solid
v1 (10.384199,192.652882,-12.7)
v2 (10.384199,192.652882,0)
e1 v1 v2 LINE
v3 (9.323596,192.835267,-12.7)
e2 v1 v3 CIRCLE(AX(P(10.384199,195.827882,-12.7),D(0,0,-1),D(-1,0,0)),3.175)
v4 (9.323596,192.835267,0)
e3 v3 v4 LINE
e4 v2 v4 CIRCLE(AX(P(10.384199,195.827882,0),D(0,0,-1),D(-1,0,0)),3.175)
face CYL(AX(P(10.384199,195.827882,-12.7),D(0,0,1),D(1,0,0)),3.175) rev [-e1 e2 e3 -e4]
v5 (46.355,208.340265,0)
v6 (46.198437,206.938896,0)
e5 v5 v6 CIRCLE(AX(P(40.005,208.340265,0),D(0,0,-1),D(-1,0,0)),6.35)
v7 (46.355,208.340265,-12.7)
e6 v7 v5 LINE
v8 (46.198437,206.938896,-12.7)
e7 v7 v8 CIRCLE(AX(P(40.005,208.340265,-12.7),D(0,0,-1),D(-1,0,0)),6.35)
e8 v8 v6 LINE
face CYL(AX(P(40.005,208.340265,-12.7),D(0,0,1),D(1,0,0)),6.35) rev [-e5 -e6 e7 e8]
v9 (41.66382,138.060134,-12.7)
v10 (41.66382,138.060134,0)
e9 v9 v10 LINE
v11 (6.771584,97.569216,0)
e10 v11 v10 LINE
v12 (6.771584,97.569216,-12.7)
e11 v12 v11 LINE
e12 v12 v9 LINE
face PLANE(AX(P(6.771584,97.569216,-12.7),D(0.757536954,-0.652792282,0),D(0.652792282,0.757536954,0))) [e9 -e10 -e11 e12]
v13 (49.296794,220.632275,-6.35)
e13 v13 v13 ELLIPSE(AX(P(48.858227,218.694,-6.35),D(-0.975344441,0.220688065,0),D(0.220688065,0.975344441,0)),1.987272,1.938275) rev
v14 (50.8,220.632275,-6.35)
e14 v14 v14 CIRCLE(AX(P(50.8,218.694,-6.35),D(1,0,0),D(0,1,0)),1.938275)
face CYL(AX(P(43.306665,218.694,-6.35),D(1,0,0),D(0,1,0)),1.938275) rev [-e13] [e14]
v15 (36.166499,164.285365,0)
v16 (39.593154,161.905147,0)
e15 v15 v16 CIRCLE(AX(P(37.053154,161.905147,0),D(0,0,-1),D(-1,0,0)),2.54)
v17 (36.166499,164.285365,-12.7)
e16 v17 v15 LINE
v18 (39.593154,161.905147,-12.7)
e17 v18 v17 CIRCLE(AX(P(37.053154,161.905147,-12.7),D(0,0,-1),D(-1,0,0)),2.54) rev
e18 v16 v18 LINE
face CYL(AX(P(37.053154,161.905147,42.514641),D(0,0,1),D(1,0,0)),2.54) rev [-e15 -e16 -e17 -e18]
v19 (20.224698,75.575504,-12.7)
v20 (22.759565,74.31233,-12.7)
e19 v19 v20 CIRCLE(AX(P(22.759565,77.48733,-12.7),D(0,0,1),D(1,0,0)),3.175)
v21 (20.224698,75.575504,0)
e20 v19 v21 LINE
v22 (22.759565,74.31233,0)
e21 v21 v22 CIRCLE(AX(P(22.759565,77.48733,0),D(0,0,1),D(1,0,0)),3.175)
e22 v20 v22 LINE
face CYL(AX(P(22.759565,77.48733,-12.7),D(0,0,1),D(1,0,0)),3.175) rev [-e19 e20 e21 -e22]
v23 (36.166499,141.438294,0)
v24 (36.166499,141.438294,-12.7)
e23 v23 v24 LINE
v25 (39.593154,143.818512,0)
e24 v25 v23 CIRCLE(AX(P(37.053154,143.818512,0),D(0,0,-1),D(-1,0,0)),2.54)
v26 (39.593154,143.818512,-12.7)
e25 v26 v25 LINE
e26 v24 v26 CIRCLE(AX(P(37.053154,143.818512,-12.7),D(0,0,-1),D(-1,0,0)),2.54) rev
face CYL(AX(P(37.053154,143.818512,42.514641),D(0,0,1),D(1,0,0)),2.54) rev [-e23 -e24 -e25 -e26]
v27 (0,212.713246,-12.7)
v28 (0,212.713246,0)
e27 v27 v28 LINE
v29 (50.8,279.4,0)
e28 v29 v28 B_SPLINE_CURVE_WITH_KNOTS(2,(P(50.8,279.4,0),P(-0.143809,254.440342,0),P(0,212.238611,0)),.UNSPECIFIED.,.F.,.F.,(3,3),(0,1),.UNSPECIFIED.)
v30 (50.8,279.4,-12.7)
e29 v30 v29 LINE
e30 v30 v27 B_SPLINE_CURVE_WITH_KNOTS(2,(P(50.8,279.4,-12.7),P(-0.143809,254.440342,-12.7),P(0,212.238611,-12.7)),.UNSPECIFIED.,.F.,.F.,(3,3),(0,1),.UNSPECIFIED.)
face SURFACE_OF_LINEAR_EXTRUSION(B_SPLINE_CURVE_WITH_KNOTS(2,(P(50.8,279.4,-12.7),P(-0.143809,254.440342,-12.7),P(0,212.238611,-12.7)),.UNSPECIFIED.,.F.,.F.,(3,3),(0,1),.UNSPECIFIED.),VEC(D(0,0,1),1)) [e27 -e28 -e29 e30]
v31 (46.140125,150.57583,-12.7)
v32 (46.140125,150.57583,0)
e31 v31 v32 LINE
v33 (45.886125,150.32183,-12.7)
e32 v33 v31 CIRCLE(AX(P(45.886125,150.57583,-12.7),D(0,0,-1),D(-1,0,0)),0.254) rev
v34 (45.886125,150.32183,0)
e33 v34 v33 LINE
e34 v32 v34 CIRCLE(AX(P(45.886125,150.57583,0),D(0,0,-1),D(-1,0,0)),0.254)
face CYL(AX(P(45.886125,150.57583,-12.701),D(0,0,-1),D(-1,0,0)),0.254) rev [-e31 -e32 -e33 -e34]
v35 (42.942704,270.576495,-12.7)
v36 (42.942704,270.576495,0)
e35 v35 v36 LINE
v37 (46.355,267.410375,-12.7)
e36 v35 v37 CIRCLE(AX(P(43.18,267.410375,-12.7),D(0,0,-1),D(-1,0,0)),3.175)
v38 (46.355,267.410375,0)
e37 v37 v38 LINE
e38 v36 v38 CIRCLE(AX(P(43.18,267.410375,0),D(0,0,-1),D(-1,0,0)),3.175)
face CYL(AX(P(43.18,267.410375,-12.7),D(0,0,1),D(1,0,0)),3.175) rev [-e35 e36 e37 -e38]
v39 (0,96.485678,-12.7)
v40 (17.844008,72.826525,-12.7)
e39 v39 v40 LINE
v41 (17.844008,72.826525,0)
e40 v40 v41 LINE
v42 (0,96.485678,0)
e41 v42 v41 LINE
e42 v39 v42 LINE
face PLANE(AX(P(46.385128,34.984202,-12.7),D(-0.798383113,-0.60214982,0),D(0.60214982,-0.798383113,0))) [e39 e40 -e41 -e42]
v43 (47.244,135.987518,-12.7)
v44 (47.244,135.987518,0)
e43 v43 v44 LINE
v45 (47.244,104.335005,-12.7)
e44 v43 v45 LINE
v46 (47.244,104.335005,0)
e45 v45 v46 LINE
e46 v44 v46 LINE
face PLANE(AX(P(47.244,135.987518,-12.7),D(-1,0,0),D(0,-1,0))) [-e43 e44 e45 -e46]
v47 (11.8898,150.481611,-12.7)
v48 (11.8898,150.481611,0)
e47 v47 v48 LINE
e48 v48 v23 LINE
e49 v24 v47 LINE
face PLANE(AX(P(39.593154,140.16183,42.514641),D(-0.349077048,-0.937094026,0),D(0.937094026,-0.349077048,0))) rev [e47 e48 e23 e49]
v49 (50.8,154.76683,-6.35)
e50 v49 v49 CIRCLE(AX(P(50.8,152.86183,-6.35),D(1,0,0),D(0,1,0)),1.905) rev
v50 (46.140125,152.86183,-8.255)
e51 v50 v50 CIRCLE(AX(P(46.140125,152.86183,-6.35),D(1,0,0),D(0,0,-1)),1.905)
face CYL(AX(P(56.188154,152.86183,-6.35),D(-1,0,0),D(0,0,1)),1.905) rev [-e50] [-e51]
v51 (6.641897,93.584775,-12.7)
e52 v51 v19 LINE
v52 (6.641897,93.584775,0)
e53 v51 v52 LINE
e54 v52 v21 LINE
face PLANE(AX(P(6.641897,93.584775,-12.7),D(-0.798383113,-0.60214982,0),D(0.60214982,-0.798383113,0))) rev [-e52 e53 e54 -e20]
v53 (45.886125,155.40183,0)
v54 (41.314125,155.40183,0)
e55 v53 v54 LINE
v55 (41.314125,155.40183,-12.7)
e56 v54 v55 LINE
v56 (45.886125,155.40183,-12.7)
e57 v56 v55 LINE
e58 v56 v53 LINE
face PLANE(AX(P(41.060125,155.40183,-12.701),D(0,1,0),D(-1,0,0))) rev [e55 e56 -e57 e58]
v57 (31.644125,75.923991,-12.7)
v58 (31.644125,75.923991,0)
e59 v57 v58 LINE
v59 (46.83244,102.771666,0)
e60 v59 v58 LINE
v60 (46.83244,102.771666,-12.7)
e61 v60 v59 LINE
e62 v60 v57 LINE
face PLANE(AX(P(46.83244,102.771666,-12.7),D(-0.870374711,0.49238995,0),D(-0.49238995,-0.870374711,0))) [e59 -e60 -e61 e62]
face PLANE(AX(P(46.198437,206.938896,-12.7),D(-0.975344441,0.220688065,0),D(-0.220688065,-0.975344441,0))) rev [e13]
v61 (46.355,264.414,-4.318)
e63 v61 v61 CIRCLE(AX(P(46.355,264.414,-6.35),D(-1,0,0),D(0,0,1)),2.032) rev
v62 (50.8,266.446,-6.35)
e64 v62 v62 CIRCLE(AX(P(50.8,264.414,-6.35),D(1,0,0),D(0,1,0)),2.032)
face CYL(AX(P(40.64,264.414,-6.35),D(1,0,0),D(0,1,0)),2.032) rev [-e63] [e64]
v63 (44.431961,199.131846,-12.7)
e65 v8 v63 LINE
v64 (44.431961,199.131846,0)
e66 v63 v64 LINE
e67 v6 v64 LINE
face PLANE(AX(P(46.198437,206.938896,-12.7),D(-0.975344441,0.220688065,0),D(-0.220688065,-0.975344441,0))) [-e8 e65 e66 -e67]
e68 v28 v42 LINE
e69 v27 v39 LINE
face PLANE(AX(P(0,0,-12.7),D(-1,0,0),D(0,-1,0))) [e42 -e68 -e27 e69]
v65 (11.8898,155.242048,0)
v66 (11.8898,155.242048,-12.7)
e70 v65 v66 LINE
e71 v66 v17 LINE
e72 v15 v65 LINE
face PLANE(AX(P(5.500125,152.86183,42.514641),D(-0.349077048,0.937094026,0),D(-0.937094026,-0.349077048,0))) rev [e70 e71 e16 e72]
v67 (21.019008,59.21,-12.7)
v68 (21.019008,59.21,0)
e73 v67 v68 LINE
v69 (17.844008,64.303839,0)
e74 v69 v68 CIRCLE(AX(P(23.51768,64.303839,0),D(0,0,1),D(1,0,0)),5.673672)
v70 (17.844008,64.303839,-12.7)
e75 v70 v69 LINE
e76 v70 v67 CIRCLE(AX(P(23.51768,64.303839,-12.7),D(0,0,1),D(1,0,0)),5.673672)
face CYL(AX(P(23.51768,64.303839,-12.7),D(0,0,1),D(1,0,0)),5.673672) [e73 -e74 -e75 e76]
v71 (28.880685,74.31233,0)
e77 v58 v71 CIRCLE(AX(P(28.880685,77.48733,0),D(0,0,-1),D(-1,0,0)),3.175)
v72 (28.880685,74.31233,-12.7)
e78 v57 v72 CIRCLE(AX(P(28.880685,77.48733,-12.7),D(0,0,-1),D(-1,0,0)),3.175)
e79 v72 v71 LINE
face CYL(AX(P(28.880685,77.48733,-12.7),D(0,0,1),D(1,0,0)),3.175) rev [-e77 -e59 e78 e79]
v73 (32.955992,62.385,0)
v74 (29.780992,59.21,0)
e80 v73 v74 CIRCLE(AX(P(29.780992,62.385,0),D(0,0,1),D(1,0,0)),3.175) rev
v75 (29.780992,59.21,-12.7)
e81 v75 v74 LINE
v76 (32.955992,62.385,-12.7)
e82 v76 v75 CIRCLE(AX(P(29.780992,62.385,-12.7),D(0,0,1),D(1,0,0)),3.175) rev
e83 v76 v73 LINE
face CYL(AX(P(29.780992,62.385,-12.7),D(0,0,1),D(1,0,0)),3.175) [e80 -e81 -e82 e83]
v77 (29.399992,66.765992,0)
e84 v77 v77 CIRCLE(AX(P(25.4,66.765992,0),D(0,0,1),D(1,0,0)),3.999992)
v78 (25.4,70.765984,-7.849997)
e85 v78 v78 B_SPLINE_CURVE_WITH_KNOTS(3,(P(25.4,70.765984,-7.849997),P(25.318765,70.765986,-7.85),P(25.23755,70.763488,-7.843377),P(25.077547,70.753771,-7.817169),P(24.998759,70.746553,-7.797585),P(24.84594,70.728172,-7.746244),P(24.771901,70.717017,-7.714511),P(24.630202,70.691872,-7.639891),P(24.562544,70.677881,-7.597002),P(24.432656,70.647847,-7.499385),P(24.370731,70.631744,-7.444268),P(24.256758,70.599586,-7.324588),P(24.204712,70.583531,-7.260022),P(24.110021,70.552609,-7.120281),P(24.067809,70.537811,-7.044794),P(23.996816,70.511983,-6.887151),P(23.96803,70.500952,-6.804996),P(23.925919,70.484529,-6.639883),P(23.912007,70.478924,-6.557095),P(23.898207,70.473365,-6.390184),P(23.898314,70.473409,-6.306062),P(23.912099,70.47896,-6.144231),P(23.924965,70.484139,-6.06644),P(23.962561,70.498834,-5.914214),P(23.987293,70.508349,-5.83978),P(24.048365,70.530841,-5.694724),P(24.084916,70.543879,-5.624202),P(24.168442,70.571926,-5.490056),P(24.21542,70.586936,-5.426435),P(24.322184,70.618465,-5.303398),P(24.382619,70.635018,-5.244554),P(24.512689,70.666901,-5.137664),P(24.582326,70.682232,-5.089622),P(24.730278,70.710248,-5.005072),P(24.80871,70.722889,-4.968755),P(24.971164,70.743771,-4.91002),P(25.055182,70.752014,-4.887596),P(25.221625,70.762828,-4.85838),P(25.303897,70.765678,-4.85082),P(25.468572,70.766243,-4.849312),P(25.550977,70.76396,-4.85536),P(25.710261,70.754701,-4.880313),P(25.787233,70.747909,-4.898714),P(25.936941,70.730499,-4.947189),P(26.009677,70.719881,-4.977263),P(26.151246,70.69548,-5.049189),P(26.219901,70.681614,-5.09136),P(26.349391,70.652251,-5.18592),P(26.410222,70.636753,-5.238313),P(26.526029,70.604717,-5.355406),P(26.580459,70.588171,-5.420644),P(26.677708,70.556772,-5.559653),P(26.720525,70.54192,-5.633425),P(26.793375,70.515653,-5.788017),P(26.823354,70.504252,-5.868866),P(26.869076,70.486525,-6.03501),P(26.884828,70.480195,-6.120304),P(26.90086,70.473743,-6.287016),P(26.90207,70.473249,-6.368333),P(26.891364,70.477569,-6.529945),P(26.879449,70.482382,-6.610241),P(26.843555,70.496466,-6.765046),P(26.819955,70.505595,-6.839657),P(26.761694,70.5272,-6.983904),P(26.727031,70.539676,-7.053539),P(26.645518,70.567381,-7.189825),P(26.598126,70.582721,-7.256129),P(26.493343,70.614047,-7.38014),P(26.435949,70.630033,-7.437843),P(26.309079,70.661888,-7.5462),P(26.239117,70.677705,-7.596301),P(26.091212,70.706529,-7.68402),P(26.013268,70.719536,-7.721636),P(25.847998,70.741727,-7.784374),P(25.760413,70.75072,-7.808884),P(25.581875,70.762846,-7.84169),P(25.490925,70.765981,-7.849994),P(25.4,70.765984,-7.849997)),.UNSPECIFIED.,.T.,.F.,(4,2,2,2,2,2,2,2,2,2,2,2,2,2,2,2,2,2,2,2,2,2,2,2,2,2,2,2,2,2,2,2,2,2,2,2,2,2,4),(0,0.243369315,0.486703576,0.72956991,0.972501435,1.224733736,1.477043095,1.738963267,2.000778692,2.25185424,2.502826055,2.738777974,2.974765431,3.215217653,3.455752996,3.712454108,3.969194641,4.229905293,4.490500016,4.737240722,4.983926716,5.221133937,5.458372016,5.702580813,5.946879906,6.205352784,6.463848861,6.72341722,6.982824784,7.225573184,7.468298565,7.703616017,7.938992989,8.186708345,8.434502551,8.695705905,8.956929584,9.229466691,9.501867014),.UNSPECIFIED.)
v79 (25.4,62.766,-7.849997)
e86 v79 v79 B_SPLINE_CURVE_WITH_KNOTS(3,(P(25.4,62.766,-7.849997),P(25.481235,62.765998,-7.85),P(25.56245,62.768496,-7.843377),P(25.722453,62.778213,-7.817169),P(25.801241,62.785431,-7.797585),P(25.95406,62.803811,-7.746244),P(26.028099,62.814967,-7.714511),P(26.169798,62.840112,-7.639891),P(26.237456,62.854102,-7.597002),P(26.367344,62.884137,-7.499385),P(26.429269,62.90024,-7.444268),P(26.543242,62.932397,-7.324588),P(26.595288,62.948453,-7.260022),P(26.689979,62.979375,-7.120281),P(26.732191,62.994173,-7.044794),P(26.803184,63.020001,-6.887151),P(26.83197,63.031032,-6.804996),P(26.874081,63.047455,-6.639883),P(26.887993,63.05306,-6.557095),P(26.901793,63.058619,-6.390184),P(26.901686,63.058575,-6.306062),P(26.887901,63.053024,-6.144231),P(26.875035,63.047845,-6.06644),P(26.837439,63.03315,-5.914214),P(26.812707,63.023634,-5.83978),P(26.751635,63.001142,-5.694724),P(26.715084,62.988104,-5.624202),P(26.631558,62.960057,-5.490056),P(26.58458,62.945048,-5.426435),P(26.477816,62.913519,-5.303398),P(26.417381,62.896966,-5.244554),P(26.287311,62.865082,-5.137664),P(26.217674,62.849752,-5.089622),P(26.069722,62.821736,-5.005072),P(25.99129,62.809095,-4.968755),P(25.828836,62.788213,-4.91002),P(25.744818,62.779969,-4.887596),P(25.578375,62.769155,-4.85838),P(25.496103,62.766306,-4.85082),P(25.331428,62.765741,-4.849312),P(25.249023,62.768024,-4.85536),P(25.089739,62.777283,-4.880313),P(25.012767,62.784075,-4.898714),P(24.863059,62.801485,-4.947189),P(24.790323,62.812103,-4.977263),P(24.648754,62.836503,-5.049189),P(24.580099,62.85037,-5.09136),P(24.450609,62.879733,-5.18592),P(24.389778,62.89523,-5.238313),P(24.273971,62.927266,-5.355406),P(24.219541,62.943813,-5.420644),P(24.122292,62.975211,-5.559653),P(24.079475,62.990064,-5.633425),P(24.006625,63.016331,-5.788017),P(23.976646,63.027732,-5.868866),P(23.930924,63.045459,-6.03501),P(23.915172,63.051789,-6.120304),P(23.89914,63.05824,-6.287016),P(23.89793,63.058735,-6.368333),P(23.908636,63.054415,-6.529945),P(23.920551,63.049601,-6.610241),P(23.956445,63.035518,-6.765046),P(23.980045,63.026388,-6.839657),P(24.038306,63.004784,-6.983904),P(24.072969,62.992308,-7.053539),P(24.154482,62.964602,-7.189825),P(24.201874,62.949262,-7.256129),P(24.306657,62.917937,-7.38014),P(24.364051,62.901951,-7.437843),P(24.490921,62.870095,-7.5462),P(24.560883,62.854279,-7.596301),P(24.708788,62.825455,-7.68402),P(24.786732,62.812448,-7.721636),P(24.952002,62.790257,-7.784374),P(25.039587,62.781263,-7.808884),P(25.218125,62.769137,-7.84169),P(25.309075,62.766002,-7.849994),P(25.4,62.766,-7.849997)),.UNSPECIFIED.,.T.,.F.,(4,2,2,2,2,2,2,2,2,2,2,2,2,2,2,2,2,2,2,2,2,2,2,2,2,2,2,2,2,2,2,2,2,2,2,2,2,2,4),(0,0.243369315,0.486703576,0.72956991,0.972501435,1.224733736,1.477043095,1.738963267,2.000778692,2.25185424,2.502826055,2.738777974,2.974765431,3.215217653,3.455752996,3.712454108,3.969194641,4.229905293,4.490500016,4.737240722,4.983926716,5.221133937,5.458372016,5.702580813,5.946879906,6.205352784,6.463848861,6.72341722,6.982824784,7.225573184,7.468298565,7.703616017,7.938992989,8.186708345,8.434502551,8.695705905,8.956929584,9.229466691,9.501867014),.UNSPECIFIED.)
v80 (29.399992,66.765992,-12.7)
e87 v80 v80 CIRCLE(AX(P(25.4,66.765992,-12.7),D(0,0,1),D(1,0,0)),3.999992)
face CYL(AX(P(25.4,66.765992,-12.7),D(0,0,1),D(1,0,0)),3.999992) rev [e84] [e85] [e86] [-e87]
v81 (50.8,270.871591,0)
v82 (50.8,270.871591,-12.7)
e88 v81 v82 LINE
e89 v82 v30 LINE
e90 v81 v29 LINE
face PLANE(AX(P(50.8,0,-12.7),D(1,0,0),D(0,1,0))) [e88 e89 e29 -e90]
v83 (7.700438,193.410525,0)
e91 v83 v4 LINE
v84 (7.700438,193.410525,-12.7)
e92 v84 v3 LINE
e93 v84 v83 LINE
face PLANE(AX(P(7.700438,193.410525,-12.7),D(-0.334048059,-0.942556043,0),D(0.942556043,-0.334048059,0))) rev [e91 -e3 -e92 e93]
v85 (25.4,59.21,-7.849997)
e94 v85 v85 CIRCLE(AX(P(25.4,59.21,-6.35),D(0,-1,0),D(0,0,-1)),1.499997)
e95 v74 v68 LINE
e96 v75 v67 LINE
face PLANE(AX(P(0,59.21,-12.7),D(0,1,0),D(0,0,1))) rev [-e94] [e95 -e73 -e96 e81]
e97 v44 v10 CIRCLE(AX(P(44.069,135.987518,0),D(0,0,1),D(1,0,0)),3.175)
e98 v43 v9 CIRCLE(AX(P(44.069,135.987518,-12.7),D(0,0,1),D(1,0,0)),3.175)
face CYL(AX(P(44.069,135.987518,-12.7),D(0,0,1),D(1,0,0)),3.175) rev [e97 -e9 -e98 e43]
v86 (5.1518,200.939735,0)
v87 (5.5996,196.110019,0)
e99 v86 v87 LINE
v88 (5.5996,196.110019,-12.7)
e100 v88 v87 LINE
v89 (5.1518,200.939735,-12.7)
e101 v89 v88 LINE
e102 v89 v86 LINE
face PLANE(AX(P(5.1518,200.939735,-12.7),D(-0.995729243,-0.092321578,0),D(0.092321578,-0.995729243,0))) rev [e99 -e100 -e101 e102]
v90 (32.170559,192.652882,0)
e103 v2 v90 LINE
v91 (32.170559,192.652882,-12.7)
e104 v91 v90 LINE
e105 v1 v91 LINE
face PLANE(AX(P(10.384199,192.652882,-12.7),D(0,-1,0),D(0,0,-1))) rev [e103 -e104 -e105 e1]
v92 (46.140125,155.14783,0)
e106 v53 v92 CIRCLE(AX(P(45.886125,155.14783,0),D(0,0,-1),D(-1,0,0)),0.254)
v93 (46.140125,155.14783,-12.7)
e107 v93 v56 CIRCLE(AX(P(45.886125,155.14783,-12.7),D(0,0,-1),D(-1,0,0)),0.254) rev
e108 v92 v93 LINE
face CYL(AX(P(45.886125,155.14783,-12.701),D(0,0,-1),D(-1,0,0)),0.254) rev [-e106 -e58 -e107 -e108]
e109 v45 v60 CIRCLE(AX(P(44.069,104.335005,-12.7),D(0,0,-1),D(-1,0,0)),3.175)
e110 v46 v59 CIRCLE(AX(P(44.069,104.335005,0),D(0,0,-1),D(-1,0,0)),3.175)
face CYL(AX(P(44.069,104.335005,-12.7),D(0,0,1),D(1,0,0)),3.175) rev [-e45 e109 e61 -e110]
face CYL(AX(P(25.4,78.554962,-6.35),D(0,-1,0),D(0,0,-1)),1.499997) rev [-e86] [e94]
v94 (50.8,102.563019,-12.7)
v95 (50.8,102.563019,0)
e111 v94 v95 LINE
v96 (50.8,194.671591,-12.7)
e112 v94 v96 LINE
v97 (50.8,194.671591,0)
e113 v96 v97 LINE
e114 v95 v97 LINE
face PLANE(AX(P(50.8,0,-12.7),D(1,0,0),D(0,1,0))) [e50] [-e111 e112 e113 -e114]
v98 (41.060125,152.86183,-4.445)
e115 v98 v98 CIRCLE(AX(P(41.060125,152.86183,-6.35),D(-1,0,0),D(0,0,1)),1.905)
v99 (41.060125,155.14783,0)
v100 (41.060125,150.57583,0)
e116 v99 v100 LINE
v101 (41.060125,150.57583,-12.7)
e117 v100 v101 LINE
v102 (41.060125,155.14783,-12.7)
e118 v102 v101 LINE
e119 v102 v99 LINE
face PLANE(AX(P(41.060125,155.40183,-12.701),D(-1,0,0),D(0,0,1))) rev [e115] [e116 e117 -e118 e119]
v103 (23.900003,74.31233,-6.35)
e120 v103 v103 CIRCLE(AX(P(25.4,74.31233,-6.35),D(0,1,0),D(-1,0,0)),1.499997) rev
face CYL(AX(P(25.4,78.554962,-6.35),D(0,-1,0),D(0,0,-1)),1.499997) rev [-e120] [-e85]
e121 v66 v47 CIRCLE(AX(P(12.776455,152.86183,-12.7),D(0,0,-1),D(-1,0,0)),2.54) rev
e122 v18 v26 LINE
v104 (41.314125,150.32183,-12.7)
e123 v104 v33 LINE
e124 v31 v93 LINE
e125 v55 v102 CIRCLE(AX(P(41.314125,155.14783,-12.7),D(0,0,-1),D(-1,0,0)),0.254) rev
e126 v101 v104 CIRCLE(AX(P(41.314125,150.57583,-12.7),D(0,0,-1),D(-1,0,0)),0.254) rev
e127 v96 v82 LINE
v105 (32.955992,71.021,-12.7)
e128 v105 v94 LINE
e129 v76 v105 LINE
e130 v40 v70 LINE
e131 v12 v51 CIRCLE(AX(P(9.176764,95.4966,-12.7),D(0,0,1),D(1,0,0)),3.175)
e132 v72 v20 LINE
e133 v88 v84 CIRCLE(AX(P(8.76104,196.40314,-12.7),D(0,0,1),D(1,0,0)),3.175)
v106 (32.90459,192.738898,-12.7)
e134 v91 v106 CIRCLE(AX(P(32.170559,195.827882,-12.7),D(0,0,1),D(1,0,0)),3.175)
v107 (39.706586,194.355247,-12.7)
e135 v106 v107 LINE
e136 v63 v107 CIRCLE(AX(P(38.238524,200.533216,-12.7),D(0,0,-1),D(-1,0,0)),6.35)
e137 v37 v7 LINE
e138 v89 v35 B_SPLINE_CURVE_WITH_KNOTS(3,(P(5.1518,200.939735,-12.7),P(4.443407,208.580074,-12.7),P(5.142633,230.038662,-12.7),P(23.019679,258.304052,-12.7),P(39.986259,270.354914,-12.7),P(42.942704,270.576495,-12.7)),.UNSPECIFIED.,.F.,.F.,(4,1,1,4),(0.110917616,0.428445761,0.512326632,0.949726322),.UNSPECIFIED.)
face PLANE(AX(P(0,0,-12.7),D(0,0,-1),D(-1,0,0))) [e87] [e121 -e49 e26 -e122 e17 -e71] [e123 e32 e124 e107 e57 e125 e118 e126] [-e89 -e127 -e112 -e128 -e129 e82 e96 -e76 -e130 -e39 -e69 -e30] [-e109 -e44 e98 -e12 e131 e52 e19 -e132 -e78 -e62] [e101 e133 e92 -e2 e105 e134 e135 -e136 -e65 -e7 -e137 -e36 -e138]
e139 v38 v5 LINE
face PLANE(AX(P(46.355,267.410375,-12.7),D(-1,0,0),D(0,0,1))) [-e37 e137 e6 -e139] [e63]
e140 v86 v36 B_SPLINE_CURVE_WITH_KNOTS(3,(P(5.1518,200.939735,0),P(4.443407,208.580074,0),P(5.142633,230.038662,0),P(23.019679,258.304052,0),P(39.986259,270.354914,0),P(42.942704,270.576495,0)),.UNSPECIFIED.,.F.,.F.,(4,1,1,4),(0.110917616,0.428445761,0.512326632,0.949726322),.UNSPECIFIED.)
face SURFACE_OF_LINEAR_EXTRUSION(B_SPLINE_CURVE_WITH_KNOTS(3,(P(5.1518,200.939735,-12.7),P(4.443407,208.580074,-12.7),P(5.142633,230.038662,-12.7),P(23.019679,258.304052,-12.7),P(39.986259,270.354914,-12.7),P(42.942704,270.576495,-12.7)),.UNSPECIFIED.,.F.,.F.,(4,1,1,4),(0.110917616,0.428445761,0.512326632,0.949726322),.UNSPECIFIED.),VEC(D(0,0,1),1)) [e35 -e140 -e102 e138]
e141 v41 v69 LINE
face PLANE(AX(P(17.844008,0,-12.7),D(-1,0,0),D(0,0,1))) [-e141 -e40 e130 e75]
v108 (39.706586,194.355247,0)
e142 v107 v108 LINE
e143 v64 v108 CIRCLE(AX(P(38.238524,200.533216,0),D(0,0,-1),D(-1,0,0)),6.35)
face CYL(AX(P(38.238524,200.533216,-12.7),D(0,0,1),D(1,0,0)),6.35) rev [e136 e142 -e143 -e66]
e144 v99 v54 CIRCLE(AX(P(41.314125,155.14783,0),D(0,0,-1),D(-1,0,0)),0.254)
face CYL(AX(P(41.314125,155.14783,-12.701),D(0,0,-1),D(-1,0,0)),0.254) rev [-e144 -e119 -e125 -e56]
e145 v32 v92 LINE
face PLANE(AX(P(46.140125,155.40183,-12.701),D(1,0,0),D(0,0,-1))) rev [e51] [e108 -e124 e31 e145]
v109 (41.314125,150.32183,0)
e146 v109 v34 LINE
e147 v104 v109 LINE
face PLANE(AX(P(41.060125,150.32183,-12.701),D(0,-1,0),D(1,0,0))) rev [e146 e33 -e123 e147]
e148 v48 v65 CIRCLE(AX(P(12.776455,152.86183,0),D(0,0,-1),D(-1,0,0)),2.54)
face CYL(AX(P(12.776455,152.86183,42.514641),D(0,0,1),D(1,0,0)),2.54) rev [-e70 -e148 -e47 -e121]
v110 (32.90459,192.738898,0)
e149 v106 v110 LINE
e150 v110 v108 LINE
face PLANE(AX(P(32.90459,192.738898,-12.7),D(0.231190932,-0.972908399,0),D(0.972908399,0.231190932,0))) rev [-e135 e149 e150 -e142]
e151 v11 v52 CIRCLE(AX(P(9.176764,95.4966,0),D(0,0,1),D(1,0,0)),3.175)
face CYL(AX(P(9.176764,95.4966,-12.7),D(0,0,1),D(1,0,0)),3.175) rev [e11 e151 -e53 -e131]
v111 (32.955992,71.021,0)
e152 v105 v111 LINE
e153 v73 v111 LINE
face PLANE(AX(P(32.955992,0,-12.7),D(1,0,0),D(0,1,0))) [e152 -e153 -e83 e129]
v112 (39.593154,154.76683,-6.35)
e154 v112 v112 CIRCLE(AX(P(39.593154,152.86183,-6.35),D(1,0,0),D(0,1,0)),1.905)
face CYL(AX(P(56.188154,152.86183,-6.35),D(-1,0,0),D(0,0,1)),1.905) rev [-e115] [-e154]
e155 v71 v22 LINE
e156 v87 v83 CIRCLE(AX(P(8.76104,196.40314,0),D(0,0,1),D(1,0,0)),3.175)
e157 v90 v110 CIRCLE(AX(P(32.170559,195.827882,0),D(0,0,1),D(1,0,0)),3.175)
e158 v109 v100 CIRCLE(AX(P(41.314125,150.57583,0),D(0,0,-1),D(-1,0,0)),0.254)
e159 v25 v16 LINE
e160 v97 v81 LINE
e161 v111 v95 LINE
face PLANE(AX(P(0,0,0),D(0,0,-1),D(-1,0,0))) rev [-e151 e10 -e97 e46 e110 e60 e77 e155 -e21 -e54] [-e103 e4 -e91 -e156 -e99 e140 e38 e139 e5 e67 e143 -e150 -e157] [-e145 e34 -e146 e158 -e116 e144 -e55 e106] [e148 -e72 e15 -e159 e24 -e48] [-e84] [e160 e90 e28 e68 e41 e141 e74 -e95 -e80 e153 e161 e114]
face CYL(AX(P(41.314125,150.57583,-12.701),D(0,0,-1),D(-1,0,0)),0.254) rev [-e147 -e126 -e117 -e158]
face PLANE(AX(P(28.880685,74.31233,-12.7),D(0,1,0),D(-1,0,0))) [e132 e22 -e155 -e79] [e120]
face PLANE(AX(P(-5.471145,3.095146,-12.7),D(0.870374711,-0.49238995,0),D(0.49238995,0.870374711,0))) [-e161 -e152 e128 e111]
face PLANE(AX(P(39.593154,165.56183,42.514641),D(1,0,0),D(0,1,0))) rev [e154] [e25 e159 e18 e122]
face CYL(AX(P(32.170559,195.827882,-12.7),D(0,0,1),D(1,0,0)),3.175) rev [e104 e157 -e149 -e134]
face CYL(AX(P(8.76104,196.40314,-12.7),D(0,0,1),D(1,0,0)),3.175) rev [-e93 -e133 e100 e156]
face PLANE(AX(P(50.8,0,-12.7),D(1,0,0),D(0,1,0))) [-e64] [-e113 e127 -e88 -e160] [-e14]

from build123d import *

# Parameters (mm, degrees)
SKETCH1_W                       = 50.8
SKETCH1_H                       = 279.4
BOSS_EXTRUDE1_DEPTH             = 12.7
SKETCH4_R                       = 3.175
CUT_EXTRUDE9_DEPTH              = 285.264471927
SKETCH12_R                      = 2.032
CUT_EXTRUDE7_DEPTH              = 10.16
SKETCH13_R                      = 3.999992
CUT_EXTRUDE8_DEPTH              = 285.264471927
CUT_EXTRUDE10_DEPTH             = 285.264471927
CUT_EXTRUDE11_START             = -1.503205808
CUT_EXTRUDE11_OUTLINE_R         = 1.938274984
CUT_EXTRUDE11_DEPTH             = 1.503205808
CUT_EXTRUDE11_START_2           = 48.41965954
CUT_EXTRUDE11_2_OUTLINE_R       = 1.938274984
CUT_EXTRUDE11_2_DEPTH           = 0.877134652
CUT_EXTRUDE11_START_3           = -2
CUT_EXTRUDE11_3_OUTLINE_W       = 7
CUT_EXTRUDE11_3_OUTLINE_H       = 7
CUT_EXTRUDE11_3_DEPTH           = 1.390444415
CUT_EXTRUDE12_REACH             = 228.331
SKETCH25_R                      = 1.499997
SKETCH27_R                      = 3.175
BOSS_EXTRUDE2_DEPTH             = 12.7
BOSS_EXTRUDE3_DEPTH             = 12.7
CUT_EXTRUDE13_REACH             = 286.264
SKETCH30_W                      = 5.08
SKETCH30_H                      = 5.08
FILLET1_R                       = 0.254
BOSS_EXTRUDE4_DEPTH             = 12.7
BOSS_EXTRUDE6_DEPTH             = 12.7
CUT_EXTRUDE16_DEPTH             = 12.7
FILLET2_R                       = 2.54
CUT_EXTRUDE15_REACH             = 285.469
SKETCH33_R                      = 1.905
CUT_EXTRUDE15_DIRECTION_2_REACH = 285.469


with BuildPart() as part:
    # Sketch1 → Boss-Extrude1 (new body)
    with BuildSketch(Plane.XY):
        with Locations((25.4, 139.7)):
            Rectangle(SKETCH1_W, SKETCH1_H)
    extrude(amount=-BOSS_EXTRUDE1_DEPTH)

    # Sketch4 → Cut-Extrude9 (cut, through all)
    with BuildSketch(Plane.XY):
        with Locations((23.83643591, 185.629212401)):
            Circle(SKETCH4_R)
    extrude(amount=-CUT_EXTRUDE9_DEPTH, mode=Mode.SUBTRACT)

    # Sketch12 → Cut-Extrude7 (cut)
    with BuildSketch(Plane(origin=(50.8, 0, 0), x_dir=(0, 0, -1), z_dir=(1, 0, 0))):
        with Locations(Location((6.35, 264.414, 0), (0, 0, 90))):
            Circle(SKETCH12_R)
    extrude(amount=-CUT_EXTRUDE7_DEPTH, mode=Mode.SUBTRACT)

    # Sketch13 → Cut-Extrude8 (cut, through all)
    with BuildSketch(Plane.XY):
        with Locations((25.4, 66.765991822)):
            Circle(SKETCH13_R)
    extrude(amount=-CUT_EXTRUDE8_DEPTH, mode=Mode.SUBTRACT)

    # Sketch23 → Cut-Extrude10 (cut, through all)
    with BuildSketch(Plane.XY):
        with BuildLine():
            ThreePointArc((9.684585518, 189.97530689), (6.134029107, 191.135611391), (3.936744482, 188.114899944))
            Line((3.936744482, 188.114899944), (3.936744482, 146.137041934))
            ThreePointArc((3.936744482, 146.137041934), (5.718074121, 143.284269963), (9.063237662, 143.632586032))
            Line((9.063237662, 143.632586032), (28.478072635, 158.76078933))
            ThreePointArc((28.478072635, 158.76078933), (29.669890916, 160.817787912), (29.09942049, 163.125652178))
            Line((29.09942049, 163.125652178), (9.684585518, 189.97530689))
        make_face()
        with BuildLine():
            ThreePointArc((25.454329065, 180.059457716), (24.214328296, 177.76665467), (24.841195831, 175.236519336))
            Line((24.841195831, 175.236519336), (41.277424699, 151.829201394))
            ThreePointArc((41.277424699, 151.829201394), (44.832564118, 150.626331551), (47.050818, 153.653749901))
            Line((47.050818, 153.653749901), (47.050818, 185.147561676))
            ThreePointArc((47.050818, 185.147561676), (46.630207739, 186.726790021), (45.479818209, 187.887599691))
            Line((45.479818209, 187.887599691), (44.197770493, 188.638101981))
            ThreePointArc((44.197770493, 188.638101981), (43.361590273, 188.9788232), (42.463311258, 189.070382588))
            Line((42.463311258, 189.070382588), (36.797920165, 188.837397982))
            ThreePointArc((36.797920165, 188.837397982), (35.770181972, 188.621293865), (34.869165079, 188.081742811))
            Line((34.869165079, 188.081742811), (25.454329065, 180.059457716))
        make_face()
        with BuildLine():
            Line((17.844008, 72.826525287), (0, 96.485678179))
            Line((0, 96.485678179), (0, 0))
            Line((0, 0), (50.8, 0))
            Line((50.8, 0), (50.8, 102.563019115))
            Line((50.8, 102.563019115), (32.955992, 71.020999822))
            Line((32.955992, 71.020999822), (32.955992, 62.384999822))
            ThreePointArc((32.955992, 62.384999822), (32.02605603, 60.139935792), (29.780992, 59.209999822))
            Line((29.780992, 59.209999822), (21.019008, 59.209999822))
            ThreePointArc((21.019008, 59.209999822), (18.702744933, 61.302679759), (17.844008, 64.303838667))
            Line((17.844008, 64.303838667), (17.844008, 72.826525287))
        make_face()
        with BuildLine():
            Line((0, 279.4), (0, 212.713248228))
            add(Edge.make_bspline(
                [(50.8, 279.4), (0.142999661, 254.58086249), (0, 212.713248228)],
                knots=[0, 0, 0, 0.994370092, 0.994370092, 0.994370092], degree=2))
            Line((50.8, 279.4), (0, 279.4))
        make_face()
        with BuildLine():
            Line((41.663820171, 138.060133531), (6.771583692, 97.569215865))
            ThreePointArc((6.771583692, 97.569215865), (6.003443965, 95.599886341), (6.641897139, 93.584774692))
            Line((6.641897139, 93.584774692), (20.224698456, 75.575503845))
            ThreePointArc((20.224698456, 75.575503845), (21.343482484, 74.645615997), (22.759564839, 74.312329523))
            Line((22.759564839, 74.312329523), (28.880684896, 74.312329523))
            ThreePointArc((28.880684896, 74.312329523), (30.480220228, 74.744682677), (31.644124603, 75.923991431))
            Line((31.644124603, 75.923991431), (46.832439707, 102.771666463))
            ThreePointArc((46.832439707, 102.771666463), (47.139386463, 103.526702652), (47.244, 104.335004554))
            Line((47.244, 104.335004554), (47.244, 135.987518036))
            ThreePointArc((47.244, 135.987518036), (45.174481579, 138.963847231), (41.663820171, 138.060133531))
        make_face()
        with BuildLine():
            Line((46.355, 208.340265374), (46.355, 267.410375004))
            ThreePointArc((46.355, 267.410375004), (45.339538097, 269.737824297), (42.942703805, 270.57649495))
            add(Edge.make_bspline(
                [(5.151800286, 200.939735337), (4.443406818, 208.580073659), (5.142632502, 230.03866236), (23.019678506, 258.304051629), (39.986259259, 270.354913629), (42.942703805, 270.57649495)],
                knots=[0.110917616, 0.110917616, 0.110917616, 0.110917616, 0.428445761, 0.512326632, 0.949726322, 0.949726322, 0.949726322, 0.949726322], degree=3))
            Line((5.151800286, 200.939735337), (5.599599739, 196.110019261))
            ThreePointArc((5.599599739, 196.110019261), (6.255400613, 194.453166983), (7.7004375, 193.410524834))
            Line((7.7004375, 193.410524834), (9.323596038, 192.835266777))
            ThreePointArc((9.323596038, 192.835266777), (9.8461136, 192.698810545), (10.384198625, 192.652882214))
            Line((10.384198625, 192.652882214), (32.17055899, 192.652882214))
            ThreePointArc((32.17055899, 192.652882214), (32.540085896, 192.674459492), (32.904590198, 192.738898047))
            Line((32.904590198, 192.738898047), (39.706586273, 194.355247347))
            ThreePointArc((39.706586273, 194.355247347), (42.752792223, 196.067358416), (44.431961055, 199.131846471))
            Line((44.431961055, 199.131846471), (46.198437199, 206.938896164))
            ThreePointArc((46.198437199, 206.938896164), (46.315737921, 207.635221479), (46.355, 208.340265374))
        make_face()
        with BuildLine():
            Line((29.980948296, 155.351785669), (4.812598642, 135.740395164))
            ThreePointArc((4.812598642, 135.740395164), (3.886943233, 134.599566539), (3.556, 133.168201993))
            Line((3.556, 133.168201993), (3.556, 110.456761818))
            ThreePointArc((3.556, 110.456761818), (5.634129033, 107.41794452), (9.219765375, 108.252356215))
            Line((9.219765375, 108.252356215), (40.635310398, 142.496582814))
            ThreePointArc((40.635310398, 142.496582814), (41.467985487, 144.51174404), (40.804546499, 146.588778291))
            Line((40.804546499, 146.588778291), (34.441290858, 154.793171429))
            ThreePointArc((34.441290858, 154.793171429), (32.32699686, 155.997718798), (29.980948296, 155.351785669))
        make_face()
    extrude(amount=-CUT_EXTRUDE10_DEPTH, mode=Mode.SUBTRACT)

    # Cut-Extrude11: read off the stored shape, not the designer's step
    # Cut-Extrude11 outline → Cut-Extrude11 (cut)
    with BuildSketch(Plane(origin=(50.8, 0, 0), x_dir=(0, 0, -1), z_dir=(1, 0, 0)).offset(CUT_EXTRUDE11_START)):
        with Locations((6.35, 218.694)):
            Circle(CUT_EXTRUDE11_OUTLINE_R)
    extrude(amount=CUT_EXTRUDE11_DEPTH, mode=Mode.SUBTRACT)

    # Cut-Extrude11 2 outline → Cut-Extrude11 2 (cut)
    with BuildSketch(Plane.YZ.offset(CUT_EXTRUDE11_START_2)):
        with Locations((218.694, -6.35)):
            Circle(CUT_EXTRUDE11_2_OUTLINE_R)
    extrude(amount=CUT_EXTRUDE11_2_DEPTH, mode=Mode.SUBTRACT)

    # Cut-Extrude11 3 outline → Cut-Extrude11 3 (add)
    with BuildSketch(Plane(origin=(0, 0, 0), x_dir=(0.22068806457460396, 0.9753444407768548, 0), z_dir=(0.9753444407768548, -0.22068806457460394, 0)).offset(CUT_EXTRUDE11_START_3)):
        with Locations((224.5, -6.5)):
            Rectangle(CUT_EXTRUDE11_3_OUTLINE_W, CUT_EXTRUDE11_3_OUTLINE_H)
    extrude(amount=CUT_EXTRUDE11_3_DEPTH)

    # Cut-Extrude12: up to this face of the body (flat: up to its plane)
    cut_extrude12_end = Plane(part.part.faces().sort_by_distance((25.820124867, 74.312329523, -6.35))[0])
    # Sketch25 → Cut-Extrude12 (cut, up to the picked face)
    with BuildSketch(Plane.XZ.offset(-59.209999822), mode=Mode.PRIVATE) as cut_extrude12_sk1:
        with Locations(Location((25.4, -6.35, 0), (0, 0, 270))):
            Circle(SKETCH25_R)
    cut_extrude12_tool1 = split(extrude(cut_extrude12_sk1.sketch, amount=-CUT_EXTRUDE12_REACH, mode=Mode.PRIVATE), bisect_by=cut_extrude12_end, keep=Keep.BOTH, mode=Mode.PRIVATE)
    add(cut_extrude12_tool1.solids().sort_by(Axis((25.4, 59.21, -6.35), (0, 1, 0)))[0], mode=Mode.SUBTRACT)

    # Sketch27 → Boss-Extrude2 (add)
    with BuildSketch(Plane.XY):
        with Locations((23.83643591, 185.629212401)):
            Circle(SKETCH27_R)
    extrude(amount=-BOSS_EXTRUDE2_DEPTH)

    # Sketch23<5> → Boss-Extrude3 (add)
    with BuildSketch(Plane.XY):
        with BuildLine():
            ThreePointArc((34.869165079, 188.081742811), (35.770181972, 188.621293865), (36.797920165, 188.837397982))
            Line((36.797920165, 188.837397982), (42.463311258, 189.070382588))
            ThreePointArc((42.463311258, 189.070382588), (43.361590273, 188.9788232), (44.197770493, 188.638101981))
            Line((44.197770493, 188.638101981), (45.479818209, 187.887599691))
            ThreePointArc((45.479818209, 187.887599691), (46.630207739, 186.726790021), (47.050818, 185.147561676))
            Line((47.050818, 185.147561676), (47.050818, 153.653749901))
            ThreePointArc((47.050818, 153.653749901), (44.832564118, 150.626331551), (41.277424699, 151.829201394))
            Line((41.277424699, 151.829201394), (24.841195831, 175.236519336))
            ThreePointArc((24.841195831, 175.236519336), (24.214328296, 177.76665467), (25.454329065, 180.059457716))
            Line((25.454329065, 180.059457716), (34.869165079, 188.081742811))
        make_face()
    extrude(amount=-BOSS_EXTRUDE3_DEPTH)

    # Sketch30 → Cut-Extrude13 (cut, up to next)
    with BuildSketch(Plane.XY, mode=Mode.PRIVATE) as cut_extrude13_sk1:
        with Locations((43.600124867, 152.861829523)):
            Rectangle(SKETCH30_W, SKETCH30_H)
    cut_extrude13_tool1 = extrude(cut_extrude13_sk1.sketch, amount=-CUT_EXTRUDE13_REACH, mode=Mode.PRIVATE) & part.part
    add(cut_extrude13_tool1.solids().sort_by_distance((43.600125, 152.86183, 0))[0], mode=Mode.SUBTRACT)

    # Fillet1
    fillet1_edges = [part.edges().sort_by_distance(p)[0] for p in [
        (41.060124867, 150.321829523, -6.35),
        (41.060124867, 155.401829523, -6.35),
        (46.140124867, 155.401829523, -6.35),
        (46.140124867, 150.321829523, -6.35),
    ]]
    fillet(fillet1_edges, radius=FILLET1_R)

    # Sketch23<6> → Boss-Extrude4 (add)
    with BuildSketch(Plane.XY):
        with BuildLine():
            ThreePointArc((29.980948296, 155.351785669), (32.32699686, 155.997718798), (34.441290858, 154.793171429))
            Line((34.441290858, 154.793171429), (40.804546499, 146.588778291))
            ThreePointArc((40.804546499, 146.588778291), (41.467985487, 144.51174404), (40.635310398, 142.496582814))
            Line((40.635310398, 142.496582814), (9.219765375, 108.252356215))
            ThreePointArc((9.219765375, 108.252356215), (5.634129033, 107.41794452), (3.556, 110.456761818))
            Line((3.556, 110.456761818), (3.556, 133.168201993))
            ThreePointArc((3.556, 133.168201993), (3.886943233, 134.599566539), (4.812598642, 135.740395164))
            Line((4.812598642, 135.740395164), (29.980948296, 155.351785669))
        make_face()
    extrude(amount=-BOSS_EXTRUDE4_DEPTH)

    # Sketch23<7> → Boss-Extrude6 (add)
    with BuildSketch(Plane.XY):
        with BuildLine():
            ThreePointArc((3.936744482, 188.114899944), (6.134029107, 191.135611391), (9.684585518, 189.97530689))
            Line((9.684585518, 189.97530689), (29.09942049, 163.125652178))
            ThreePointArc((29.09942049, 163.125652178), (29.669890916, 160.817787912), (28.478072635, 158.76078933))
            Line((28.478072635, 158.76078933), (9.063237662, 143.632586032))
            ThreePointArc((9.063237662, 143.632586032), (5.718074121, 143.284269963), (3.936744482, 146.137041934))
            Line((3.936744482, 146.137041934), (3.936744482, 188.114899944))
        make_face()
    extrude(amount=-BOSS_EXTRUDE6_DEPTH)

    # Sketch37 → Cut-Extrude16 (cut)
    with BuildSketch(Plane(origin=(0, 0, -12.7), x_dir=(-1, 0, 0), z_dir=(0, 0, -1))):
        Polygon((-5.500124867, 152.861829523), (-39.593154467, 165.561829523), (-39.593154467, 140.161829523), align=None)
    extrude(amount=-CUT_EXTRUDE16_DEPTH, mode=Mode.SUBTRACT)

    # Fillet2
    fillet2_edges = [part.edges().sort_by_distance(p)[0] for p in [
        (5.500124867, 152.861829523, -6.35),
        (39.593154467, 140.161829523, -6.35),
        (39.593154467, 165.561829523, -6.35),
    ]]
    fillet(fillet2_edges, radius=FILLET2_R)

    # Cut-Extrude15: up to this face of the body (flat: up to its plane)
    cut_extrude15_end = Plane(part.part.faces().sort_by_distance((50.8, 190.405374974, -6.35))[0])
    # Sketch33 → Cut-Extrude15 (cut, up to the picked face)
    with BuildSketch(Plane.ZY.offset(-46.140124867), mode=Mode.PRIVATE) as cut_extrude15_sk1:
        with Locations((-6.35, 152.861829523)):
            Circle(SKETCH33_R)
    cut_extrude15_tool1 = split(extrude(cut_extrude15_sk1.sketch, amount=-CUT_EXTRUDE15_REACH, mode=Mode.PRIVATE), bisect_by=cut_extrude15_end, keep=Keep.BOTH, mode=Mode.PRIVATE)
    add(cut_extrude15_tool1.solids().sort_by(Axis((46.140125, 152.86183, -6.35), (1, 0, 0)))[0], mode=Mode.SUBTRACT)

    # Cut-Extrude15 direction 2: up to this face of the body (flat: up to its plane)
    cut_extrude15_direction_2_end = Plane(part.part.faces().sort_by_distance((39.593154467, 152.861829523, -6.35))[0])
    # Sketch33 → Cut-Extrude15 direction 2 (cut, up to the picked face)
    with BuildSketch(Plane.ZY.offset(-46.140124867), mode=Mode.PRIVATE) as cut_extrude15_direction_2_sk1:
        with Locations((-6.35, 152.861829523)):
            Circle(SKETCH33_R)
    cut_extrude15_direction_2_tool1 = split(extrude(cut_extrude15_direction_2_sk1.sketch, amount=CUT_EXTRUDE15_DIRECTION_2_REACH, mode=Mode.PRIVATE), bisect_by=cut_extrude15_direction_2_end, keep=Keep.BOTH, mode=Mode.PRIVATE)
    add(cut_extrude15_direction_2_tool1.solids().sort_by(Axis((46.140125, 152.86183, -6.35), (-1, 0, 0)))[0], mode=Mode.SUBTRACT)


solid = part.part
